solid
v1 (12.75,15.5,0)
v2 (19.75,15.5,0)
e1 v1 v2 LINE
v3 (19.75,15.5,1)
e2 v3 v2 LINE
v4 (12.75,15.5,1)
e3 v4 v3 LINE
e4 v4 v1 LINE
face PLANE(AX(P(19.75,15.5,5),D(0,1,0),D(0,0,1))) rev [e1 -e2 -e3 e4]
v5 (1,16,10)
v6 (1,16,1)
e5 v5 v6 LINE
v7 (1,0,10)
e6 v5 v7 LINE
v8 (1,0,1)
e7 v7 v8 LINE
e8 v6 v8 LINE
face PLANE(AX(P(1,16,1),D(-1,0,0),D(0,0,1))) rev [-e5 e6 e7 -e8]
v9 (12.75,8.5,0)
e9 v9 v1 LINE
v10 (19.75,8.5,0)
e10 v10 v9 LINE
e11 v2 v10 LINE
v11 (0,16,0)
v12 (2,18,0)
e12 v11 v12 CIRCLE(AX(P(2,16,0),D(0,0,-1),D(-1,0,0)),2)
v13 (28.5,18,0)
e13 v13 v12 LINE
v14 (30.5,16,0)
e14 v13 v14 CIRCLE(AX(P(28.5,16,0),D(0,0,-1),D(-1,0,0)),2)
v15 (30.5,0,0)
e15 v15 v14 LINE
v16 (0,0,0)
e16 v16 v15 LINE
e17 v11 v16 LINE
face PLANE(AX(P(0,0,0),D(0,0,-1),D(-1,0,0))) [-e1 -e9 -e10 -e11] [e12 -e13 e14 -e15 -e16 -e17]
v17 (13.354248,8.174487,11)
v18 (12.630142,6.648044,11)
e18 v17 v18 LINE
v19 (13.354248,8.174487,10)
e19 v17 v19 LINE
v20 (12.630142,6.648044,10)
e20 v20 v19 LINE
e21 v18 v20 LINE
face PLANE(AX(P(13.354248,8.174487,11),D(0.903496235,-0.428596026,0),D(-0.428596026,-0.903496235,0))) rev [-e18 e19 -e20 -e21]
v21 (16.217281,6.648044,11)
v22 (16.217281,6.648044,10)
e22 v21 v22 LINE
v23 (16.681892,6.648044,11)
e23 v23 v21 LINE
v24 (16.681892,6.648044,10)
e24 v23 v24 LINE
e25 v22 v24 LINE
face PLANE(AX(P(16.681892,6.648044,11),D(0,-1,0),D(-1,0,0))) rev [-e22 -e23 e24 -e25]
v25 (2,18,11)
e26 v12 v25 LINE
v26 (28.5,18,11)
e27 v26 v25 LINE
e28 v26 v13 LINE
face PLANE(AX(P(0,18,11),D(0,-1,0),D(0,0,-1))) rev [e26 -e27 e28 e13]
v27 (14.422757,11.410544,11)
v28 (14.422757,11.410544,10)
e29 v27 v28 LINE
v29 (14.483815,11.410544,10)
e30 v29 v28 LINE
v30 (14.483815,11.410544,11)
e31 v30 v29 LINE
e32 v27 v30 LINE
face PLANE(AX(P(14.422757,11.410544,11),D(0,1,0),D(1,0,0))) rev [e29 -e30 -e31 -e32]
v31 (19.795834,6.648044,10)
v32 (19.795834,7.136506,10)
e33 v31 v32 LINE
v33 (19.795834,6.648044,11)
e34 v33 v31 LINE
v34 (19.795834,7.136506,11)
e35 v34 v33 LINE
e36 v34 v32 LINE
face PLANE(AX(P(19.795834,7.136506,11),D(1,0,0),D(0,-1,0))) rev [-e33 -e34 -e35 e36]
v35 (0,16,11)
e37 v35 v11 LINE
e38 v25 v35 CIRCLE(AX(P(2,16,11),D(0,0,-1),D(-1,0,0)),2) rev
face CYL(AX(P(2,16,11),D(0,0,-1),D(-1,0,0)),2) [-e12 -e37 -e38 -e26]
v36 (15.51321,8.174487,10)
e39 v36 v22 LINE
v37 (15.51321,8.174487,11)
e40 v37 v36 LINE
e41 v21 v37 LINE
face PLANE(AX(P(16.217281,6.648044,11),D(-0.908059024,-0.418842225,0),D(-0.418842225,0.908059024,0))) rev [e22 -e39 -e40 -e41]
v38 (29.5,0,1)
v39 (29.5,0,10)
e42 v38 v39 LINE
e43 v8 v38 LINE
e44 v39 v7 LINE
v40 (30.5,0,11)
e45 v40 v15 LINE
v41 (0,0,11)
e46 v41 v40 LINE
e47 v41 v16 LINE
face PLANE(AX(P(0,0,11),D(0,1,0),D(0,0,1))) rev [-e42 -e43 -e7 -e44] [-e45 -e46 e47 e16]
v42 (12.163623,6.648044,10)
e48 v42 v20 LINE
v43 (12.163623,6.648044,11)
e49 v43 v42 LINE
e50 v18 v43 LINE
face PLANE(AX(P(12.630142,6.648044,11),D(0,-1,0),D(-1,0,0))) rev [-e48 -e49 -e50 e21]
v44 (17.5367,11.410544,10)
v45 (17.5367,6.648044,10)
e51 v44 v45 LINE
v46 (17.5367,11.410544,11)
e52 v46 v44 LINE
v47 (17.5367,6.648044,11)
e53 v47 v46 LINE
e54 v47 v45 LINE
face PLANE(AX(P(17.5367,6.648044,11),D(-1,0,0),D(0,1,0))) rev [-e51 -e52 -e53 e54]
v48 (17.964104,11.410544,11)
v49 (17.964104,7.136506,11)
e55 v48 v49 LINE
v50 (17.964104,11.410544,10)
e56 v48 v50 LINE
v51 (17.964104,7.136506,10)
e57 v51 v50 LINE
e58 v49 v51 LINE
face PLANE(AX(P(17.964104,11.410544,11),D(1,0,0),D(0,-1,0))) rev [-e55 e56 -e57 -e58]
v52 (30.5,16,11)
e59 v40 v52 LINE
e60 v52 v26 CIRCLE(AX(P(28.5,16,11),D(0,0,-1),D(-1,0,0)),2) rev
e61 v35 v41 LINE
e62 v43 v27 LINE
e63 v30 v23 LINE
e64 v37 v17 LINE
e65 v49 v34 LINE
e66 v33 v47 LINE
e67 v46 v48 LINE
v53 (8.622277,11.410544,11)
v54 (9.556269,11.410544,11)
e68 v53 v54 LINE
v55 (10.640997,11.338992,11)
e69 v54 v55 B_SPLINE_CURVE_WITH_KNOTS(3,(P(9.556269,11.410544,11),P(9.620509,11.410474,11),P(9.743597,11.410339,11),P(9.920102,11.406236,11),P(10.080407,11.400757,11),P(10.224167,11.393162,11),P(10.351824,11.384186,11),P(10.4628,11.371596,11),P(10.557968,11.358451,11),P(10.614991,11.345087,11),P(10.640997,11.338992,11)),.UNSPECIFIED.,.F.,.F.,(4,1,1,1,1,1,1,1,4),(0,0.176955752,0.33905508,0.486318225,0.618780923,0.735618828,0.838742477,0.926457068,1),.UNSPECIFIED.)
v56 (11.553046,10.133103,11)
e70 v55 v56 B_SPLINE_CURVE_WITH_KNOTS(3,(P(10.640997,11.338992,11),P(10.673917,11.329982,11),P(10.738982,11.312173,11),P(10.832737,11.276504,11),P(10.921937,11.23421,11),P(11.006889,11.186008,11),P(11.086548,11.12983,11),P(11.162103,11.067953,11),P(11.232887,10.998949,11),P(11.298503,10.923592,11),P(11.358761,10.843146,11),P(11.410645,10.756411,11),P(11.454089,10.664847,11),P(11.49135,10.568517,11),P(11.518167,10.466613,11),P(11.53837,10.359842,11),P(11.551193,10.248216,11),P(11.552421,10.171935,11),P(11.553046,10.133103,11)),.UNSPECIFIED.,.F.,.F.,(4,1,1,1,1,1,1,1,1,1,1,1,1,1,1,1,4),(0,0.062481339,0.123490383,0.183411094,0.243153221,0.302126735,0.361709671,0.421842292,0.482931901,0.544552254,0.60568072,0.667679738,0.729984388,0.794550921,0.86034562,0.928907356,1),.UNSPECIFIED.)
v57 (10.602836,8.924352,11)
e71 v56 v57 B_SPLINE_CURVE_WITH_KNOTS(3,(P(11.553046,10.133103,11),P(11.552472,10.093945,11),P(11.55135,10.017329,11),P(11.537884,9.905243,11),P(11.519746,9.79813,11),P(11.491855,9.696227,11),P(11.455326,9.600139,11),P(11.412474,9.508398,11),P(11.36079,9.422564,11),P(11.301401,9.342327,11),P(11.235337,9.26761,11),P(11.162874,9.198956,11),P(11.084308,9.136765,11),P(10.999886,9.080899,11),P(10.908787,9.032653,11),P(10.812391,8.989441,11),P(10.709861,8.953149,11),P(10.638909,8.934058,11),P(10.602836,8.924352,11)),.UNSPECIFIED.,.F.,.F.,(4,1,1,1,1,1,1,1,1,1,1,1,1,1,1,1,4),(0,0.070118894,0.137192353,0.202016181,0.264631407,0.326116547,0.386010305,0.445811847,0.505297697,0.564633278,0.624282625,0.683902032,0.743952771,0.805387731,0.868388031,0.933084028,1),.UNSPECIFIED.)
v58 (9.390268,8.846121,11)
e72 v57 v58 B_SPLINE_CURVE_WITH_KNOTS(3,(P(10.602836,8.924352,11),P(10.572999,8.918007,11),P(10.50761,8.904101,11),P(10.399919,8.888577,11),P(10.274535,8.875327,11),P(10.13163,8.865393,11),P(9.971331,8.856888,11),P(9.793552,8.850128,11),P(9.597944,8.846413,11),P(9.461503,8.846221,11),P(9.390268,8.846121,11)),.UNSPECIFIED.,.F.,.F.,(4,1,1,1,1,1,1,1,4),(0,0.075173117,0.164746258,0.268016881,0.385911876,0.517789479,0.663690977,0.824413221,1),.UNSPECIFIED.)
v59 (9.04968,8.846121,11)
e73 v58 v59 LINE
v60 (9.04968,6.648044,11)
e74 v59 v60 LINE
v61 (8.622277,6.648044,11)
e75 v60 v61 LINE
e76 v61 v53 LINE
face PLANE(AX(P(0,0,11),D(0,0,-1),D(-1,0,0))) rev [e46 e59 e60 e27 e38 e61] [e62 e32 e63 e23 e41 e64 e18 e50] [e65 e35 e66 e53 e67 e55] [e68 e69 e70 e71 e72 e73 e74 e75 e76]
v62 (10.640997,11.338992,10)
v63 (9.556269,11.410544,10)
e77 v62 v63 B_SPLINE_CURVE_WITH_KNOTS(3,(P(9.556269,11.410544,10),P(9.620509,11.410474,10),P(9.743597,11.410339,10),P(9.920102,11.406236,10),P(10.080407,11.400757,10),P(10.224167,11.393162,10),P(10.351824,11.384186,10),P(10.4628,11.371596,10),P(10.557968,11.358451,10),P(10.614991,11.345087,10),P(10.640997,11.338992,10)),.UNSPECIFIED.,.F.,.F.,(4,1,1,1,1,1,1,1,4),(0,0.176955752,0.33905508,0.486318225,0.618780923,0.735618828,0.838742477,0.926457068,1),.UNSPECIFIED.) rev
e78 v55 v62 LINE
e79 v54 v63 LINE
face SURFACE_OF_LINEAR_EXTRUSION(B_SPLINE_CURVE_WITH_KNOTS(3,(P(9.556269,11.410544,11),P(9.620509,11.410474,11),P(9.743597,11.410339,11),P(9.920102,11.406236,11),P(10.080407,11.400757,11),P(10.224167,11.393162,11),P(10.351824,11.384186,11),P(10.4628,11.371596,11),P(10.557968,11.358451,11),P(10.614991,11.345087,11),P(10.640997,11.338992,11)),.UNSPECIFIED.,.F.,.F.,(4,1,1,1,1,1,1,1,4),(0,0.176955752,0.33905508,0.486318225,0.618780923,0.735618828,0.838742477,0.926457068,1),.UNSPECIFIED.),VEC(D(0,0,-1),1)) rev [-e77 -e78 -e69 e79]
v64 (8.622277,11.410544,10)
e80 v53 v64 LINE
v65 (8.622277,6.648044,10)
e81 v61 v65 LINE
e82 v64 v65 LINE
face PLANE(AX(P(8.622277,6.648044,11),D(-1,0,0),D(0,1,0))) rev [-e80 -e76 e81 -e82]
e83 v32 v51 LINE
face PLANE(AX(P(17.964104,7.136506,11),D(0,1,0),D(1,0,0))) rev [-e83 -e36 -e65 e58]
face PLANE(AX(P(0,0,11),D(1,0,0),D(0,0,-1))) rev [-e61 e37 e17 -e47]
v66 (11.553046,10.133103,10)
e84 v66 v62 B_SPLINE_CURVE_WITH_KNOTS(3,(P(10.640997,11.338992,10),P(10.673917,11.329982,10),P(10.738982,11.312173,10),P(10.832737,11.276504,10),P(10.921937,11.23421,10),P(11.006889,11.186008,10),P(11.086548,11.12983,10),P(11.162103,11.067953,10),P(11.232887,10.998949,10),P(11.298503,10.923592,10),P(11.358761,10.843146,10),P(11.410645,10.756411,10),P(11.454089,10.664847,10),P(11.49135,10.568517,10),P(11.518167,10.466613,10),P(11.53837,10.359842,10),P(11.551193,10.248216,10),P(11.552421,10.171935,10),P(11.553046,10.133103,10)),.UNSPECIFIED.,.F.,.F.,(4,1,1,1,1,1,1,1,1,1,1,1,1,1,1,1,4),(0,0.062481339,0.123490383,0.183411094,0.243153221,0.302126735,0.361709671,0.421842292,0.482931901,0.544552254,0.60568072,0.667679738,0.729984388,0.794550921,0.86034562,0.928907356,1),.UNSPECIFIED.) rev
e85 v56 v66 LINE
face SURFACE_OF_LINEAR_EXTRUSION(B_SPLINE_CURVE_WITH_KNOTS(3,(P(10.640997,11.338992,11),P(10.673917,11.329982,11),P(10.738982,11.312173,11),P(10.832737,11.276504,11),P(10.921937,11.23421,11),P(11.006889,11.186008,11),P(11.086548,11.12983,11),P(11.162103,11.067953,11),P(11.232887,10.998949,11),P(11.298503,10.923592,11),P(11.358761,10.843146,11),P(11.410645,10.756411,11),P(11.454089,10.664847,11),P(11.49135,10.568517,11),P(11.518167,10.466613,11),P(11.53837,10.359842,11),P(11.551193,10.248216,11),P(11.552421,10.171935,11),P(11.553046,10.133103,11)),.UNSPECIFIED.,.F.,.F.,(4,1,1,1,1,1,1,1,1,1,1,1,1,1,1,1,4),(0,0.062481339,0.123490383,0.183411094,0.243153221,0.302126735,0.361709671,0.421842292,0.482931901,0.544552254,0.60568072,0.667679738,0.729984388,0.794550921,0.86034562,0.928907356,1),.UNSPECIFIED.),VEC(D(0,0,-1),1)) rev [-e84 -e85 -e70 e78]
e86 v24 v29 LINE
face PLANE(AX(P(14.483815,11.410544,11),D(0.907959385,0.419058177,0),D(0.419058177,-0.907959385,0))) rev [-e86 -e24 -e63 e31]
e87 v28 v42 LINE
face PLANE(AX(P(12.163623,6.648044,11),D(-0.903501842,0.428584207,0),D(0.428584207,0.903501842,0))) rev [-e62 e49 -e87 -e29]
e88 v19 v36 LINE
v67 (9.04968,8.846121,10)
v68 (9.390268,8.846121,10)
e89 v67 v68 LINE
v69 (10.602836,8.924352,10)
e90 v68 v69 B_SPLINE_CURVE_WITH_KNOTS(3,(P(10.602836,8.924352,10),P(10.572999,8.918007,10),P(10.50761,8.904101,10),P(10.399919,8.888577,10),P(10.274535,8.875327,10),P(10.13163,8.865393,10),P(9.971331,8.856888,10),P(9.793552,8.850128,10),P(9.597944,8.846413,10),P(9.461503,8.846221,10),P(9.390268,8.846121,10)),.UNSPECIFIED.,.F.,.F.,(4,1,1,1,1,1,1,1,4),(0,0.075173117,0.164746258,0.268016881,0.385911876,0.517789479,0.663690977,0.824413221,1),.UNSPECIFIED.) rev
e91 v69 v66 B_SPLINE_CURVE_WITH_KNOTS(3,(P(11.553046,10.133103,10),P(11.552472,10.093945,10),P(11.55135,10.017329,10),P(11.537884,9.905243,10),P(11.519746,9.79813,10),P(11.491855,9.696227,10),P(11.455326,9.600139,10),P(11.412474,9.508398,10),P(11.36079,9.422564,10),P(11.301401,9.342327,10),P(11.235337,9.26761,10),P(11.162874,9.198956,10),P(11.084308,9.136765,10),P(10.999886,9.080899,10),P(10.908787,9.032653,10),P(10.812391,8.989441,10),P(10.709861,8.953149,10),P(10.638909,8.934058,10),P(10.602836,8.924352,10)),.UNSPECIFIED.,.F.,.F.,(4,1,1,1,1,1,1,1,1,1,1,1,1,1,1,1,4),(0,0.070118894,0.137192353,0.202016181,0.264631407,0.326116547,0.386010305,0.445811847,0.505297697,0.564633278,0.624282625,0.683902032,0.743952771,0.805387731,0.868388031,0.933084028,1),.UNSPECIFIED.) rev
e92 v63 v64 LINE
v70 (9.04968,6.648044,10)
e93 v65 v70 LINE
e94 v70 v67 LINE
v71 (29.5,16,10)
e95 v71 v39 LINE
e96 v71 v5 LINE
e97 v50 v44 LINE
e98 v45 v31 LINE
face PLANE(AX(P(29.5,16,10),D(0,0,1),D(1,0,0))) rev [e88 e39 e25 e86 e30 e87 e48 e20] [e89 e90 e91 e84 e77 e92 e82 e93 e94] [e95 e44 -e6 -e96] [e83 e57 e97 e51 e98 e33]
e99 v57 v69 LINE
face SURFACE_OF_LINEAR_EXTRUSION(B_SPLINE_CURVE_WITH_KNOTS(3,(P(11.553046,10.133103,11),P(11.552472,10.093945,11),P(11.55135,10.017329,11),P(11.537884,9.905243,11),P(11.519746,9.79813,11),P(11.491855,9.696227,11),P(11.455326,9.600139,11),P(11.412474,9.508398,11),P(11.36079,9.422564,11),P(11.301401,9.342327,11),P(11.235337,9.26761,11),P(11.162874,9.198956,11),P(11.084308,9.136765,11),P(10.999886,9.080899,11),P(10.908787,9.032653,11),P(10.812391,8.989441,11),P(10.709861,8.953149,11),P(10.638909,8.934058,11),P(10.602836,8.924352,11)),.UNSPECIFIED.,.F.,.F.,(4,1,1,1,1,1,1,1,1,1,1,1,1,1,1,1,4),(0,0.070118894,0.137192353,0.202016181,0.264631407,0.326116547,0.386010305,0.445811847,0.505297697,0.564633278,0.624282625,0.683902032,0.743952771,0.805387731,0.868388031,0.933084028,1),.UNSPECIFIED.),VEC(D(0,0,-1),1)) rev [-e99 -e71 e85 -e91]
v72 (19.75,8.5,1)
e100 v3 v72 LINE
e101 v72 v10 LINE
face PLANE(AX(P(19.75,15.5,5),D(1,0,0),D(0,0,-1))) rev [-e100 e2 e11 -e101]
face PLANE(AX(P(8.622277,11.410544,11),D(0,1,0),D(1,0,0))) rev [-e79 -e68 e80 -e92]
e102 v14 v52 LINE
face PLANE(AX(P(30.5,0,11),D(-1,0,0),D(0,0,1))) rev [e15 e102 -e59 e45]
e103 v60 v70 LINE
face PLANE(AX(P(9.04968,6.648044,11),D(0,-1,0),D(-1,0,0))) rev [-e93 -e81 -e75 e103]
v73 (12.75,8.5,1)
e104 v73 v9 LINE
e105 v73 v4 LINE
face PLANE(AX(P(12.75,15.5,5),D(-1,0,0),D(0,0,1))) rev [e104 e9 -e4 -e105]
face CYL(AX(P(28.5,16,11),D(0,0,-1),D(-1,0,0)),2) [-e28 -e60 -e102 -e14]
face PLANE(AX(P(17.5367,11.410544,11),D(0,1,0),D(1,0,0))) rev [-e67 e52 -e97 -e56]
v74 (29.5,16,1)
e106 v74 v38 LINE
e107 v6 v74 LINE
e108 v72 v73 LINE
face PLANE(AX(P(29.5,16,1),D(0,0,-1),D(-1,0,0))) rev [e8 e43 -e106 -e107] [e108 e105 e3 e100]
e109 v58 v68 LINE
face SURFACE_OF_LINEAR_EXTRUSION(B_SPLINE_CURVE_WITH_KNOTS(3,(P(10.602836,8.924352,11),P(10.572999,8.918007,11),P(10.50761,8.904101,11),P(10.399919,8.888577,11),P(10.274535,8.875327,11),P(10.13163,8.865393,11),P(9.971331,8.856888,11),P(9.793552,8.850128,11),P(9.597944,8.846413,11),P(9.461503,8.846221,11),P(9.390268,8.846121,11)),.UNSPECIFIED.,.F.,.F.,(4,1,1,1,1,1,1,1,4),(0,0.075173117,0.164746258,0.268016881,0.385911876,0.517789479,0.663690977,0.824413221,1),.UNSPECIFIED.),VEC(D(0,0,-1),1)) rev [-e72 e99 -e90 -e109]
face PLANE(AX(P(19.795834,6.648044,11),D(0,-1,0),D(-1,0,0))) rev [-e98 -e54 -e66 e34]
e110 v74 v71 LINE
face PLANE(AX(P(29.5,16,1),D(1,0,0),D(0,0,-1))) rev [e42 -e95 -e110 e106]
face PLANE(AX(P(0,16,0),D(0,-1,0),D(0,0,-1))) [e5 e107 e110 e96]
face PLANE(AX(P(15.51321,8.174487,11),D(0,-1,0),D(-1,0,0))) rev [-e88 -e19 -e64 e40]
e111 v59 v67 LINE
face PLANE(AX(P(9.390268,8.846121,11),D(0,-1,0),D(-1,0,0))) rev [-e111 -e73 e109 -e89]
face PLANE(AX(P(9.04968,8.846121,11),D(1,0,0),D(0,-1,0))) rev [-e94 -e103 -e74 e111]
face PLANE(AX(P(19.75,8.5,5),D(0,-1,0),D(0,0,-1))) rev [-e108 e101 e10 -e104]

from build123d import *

# Parameters (mm, degrees)
SKETCH1_W           = 30.5
SKETCH1_H           = 18
BOSS_EXTRUDE1_DEPTH = 11
SKETCH3_W           = 28.5
SKETCH3_H           = 9
CUT_EXTRUDE2_DEPTH  = 16
SKETCH4_W           = 7
SKETCH4_H           = 7
CUT_EXTRUDE4_DEPTH  = 5
FILLET4_R           = 2
FILLET5_R           = 2
WRAP2_START         = -1
WRAP2_DEPTH         = 1


# Read off the part's stored shape, not the designer's step: Wrap2
with BuildPart() as part:
    # Sketch1 → Boss-Extrude1 (new body)
    with BuildSketch(Plane.XY):
        with Locations((15.25, 9)):
            Rectangle(SKETCH1_W, SKETCH1_H)
    extrude(amount=BOSS_EXTRUDE1_DEPTH)

    # Sketch3 → Cut-Extrude2 (cut)
    with BuildSketch(Plane(origin=(0, 0, 0), x_dir=(-1, 0, 0), z_dir=(0, -1, 0))):
        with Locations((-15.25, -5.5)):
            Rectangle(SKETCH3_W, SKETCH3_H)
    extrude(amount=-CUT_EXTRUDE2_DEPTH, mode=Mode.SUBTRACT)

    # Sketch4 → Cut-Extrude4 (cut)
    with BuildSketch(Plane(origin=(0, 0, 0), x_dir=(-1, 0, 0), z_dir=(0, 0, -1))):
        with Locations((-16.25, 12)):
            Rectangle(SKETCH4_W, SKETCH4_H)
    extrude(amount=-CUT_EXTRUDE4_DEPTH, mode=Mode.SUBTRACT)

    # Fillet4
    fillet4_edges = [part.edges().sort_by_distance(p)[0] for p in [
        (30.5, 18, 5.5),
    ]]
    fillet(fillet4_edges, radius=FILLET4_R)

    # Fillet5
    fillet5_edges = [part.edges().sort_by_distance(p)[0] for p in [
        (0, 18, 5.5),
    ]]
    fillet(fillet5_edges, radius=FILLET5_R)

    # Wrap2 outline → Wrap2 (cut)
    with BuildSketch(Plane.XY.offset(11).offset(WRAP2_START)):
        with BuildLine():
            add(Edge.make_bspline(
                [(9.556268529, 11.410544446), (9.620509083, 11.41047383), (9.743596838, 11.410338527), (9.920101968, 11.406236319), (10.080407352, 11.400757142), (10.224167335, 11.39316178), (10.35182424, 11.384185705), (10.462800423, 11.371596323), (10.557968176, 11.358451421), (10.61499088, 11.345087293), (10.640996594, 11.338992463)],
                knots=[0, 0, 0, 0, 0.176955752, 0.33905508, 0.486318225, 0.618780923, 0.735618828, 0.838742477, 0.926457068, 1, 1, 1, 1], degree=3))
            Line((9.556268529, 11.410544446), (8.622276642, 11.410544446))
            Line((8.622276642, 11.410544446), (8.622276642, 6.648044446))
            Line((8.622276642, 6.648044446), (9.049680488, 6.648044446))
            Line((9.049680488, 6.648044446), (9.049680488, 8.846121369))
            Line((9.049680488, 8.846121369), (9.390267928, 8.846121369))
            add(Edge.make_bspline(
                [(10.602835536, 8.924351537), (10.572998699, 8.918006552), (10.507609537, 8.904101149), (10.399918904, 8.888577499), (10.274535361, 8.875327406), (10.131630045, 8.865392644), (9.971331228, 8.856887679), (9.793552195, 8.850127522), (9.597943969, 8.846412971), (9.461503455, 8.846221392), (9.390267928, 8.846121369)],
                knots=[0, 0, 0, 0, 0.075173117, 0.164746258, 0.268016881, 0.385911876, 0.517789479, 0.663690977, 0.824413221, 1, 1, 1, 1], degree=3))
            add(Edge.make_bspline(
                [(11.553045872, 10.13310304), (11.552472434, 10.093944708), (11.551350462, 10.017328787), (11.537884445, 9.905242957), (11.519745863, 9.798129719), (11.491855231, 9.696226574), (11.45532594, 9.600138686), (11.412474254, 9.508397653), (11.360789522, 9.422564242), (11.301401379, 9.342326843), (11.23533653, 9.267610141), (11.162874497, 9.198955581), (11.084307817, 9.136765035), (10.999886179, 9.080899081), (10.908786564, 9.032653215), (10.812390633, 8.989440597), (10.709860517, 8.953148904), (10.638909454, 8.934057999), (10.602835536, 8.924351537)],
                knots=[0, 0, 0, 0, 0.070118894, 0.137192353, 0.202016181, 0.264631407, 0.326116547, 0.386010305, 0.445811847, 0.505297697, 0.564633278, 0.624282625, 0.683902032, 0.743952771, 0.805387731, 0.868388031, 0.933084028, 1, 1, 1, 1], degree=3))
            add(Edge.make_bspline(
                [(10.640996594, 11.338992463), (10.673917081, 11.329981881), (10.738982325, 11.312173041), (10.832736958, 11.276503653), (10.921937012, 11.234209707), (11.006888526, 11.186007846), (11.086547574, 11.129829989), (11.162102652, 11.067953387), (11.232886982, 10.998949432), (11.298502519, 10.923592068), (11.358761475, 10.843146353), (11.410645079, 10.756411391), (11.454088913, 10.664847153), (11.491349722, 10.568517329), (11.518167298, 10.466612996), (11.538369686, 10.35984222), (11.551192551, 10.248216445), (11.55242068, 10.171934982), (11.553045872, 10.13310304)],
                knots=[0, 0, 0, 0, 0.062481339, 0.123490383, 0.183411094, 0.243153221, 0.302126735, 0.361709671, 0.421842292, 0.482931901, 0.544552254, 0.60568072, 0.667679738, 0.729984388, 0.794550921, 0.86034562, 0.928907356, 1, 1, 1, 1], degree=3))
        make_face()
        Polygon((19.795834334, 7.136505985), (17.964103565, 7.136505985), (17.964103565, 11.410544446), (17.536699719, 11.410544446), (17.536699719, 6.648044446), (19.795834334, 6.648044446), align=None)
        Polygon((15.513209634, 8.174486754), (16.217281149, 6.648044446), (16.681892026, 6.648044446), (14.483815103, 11.410544446), (14.422757411, 11.410544446), (12.163622795, 6.648044446), (12.630141726, 6.648044446), (13.354247795, 8.174486754), align=None)
    extrude(amount=WRAP2_DEPTH, mode=Mode.SUBTRACT)


solid = part.part
